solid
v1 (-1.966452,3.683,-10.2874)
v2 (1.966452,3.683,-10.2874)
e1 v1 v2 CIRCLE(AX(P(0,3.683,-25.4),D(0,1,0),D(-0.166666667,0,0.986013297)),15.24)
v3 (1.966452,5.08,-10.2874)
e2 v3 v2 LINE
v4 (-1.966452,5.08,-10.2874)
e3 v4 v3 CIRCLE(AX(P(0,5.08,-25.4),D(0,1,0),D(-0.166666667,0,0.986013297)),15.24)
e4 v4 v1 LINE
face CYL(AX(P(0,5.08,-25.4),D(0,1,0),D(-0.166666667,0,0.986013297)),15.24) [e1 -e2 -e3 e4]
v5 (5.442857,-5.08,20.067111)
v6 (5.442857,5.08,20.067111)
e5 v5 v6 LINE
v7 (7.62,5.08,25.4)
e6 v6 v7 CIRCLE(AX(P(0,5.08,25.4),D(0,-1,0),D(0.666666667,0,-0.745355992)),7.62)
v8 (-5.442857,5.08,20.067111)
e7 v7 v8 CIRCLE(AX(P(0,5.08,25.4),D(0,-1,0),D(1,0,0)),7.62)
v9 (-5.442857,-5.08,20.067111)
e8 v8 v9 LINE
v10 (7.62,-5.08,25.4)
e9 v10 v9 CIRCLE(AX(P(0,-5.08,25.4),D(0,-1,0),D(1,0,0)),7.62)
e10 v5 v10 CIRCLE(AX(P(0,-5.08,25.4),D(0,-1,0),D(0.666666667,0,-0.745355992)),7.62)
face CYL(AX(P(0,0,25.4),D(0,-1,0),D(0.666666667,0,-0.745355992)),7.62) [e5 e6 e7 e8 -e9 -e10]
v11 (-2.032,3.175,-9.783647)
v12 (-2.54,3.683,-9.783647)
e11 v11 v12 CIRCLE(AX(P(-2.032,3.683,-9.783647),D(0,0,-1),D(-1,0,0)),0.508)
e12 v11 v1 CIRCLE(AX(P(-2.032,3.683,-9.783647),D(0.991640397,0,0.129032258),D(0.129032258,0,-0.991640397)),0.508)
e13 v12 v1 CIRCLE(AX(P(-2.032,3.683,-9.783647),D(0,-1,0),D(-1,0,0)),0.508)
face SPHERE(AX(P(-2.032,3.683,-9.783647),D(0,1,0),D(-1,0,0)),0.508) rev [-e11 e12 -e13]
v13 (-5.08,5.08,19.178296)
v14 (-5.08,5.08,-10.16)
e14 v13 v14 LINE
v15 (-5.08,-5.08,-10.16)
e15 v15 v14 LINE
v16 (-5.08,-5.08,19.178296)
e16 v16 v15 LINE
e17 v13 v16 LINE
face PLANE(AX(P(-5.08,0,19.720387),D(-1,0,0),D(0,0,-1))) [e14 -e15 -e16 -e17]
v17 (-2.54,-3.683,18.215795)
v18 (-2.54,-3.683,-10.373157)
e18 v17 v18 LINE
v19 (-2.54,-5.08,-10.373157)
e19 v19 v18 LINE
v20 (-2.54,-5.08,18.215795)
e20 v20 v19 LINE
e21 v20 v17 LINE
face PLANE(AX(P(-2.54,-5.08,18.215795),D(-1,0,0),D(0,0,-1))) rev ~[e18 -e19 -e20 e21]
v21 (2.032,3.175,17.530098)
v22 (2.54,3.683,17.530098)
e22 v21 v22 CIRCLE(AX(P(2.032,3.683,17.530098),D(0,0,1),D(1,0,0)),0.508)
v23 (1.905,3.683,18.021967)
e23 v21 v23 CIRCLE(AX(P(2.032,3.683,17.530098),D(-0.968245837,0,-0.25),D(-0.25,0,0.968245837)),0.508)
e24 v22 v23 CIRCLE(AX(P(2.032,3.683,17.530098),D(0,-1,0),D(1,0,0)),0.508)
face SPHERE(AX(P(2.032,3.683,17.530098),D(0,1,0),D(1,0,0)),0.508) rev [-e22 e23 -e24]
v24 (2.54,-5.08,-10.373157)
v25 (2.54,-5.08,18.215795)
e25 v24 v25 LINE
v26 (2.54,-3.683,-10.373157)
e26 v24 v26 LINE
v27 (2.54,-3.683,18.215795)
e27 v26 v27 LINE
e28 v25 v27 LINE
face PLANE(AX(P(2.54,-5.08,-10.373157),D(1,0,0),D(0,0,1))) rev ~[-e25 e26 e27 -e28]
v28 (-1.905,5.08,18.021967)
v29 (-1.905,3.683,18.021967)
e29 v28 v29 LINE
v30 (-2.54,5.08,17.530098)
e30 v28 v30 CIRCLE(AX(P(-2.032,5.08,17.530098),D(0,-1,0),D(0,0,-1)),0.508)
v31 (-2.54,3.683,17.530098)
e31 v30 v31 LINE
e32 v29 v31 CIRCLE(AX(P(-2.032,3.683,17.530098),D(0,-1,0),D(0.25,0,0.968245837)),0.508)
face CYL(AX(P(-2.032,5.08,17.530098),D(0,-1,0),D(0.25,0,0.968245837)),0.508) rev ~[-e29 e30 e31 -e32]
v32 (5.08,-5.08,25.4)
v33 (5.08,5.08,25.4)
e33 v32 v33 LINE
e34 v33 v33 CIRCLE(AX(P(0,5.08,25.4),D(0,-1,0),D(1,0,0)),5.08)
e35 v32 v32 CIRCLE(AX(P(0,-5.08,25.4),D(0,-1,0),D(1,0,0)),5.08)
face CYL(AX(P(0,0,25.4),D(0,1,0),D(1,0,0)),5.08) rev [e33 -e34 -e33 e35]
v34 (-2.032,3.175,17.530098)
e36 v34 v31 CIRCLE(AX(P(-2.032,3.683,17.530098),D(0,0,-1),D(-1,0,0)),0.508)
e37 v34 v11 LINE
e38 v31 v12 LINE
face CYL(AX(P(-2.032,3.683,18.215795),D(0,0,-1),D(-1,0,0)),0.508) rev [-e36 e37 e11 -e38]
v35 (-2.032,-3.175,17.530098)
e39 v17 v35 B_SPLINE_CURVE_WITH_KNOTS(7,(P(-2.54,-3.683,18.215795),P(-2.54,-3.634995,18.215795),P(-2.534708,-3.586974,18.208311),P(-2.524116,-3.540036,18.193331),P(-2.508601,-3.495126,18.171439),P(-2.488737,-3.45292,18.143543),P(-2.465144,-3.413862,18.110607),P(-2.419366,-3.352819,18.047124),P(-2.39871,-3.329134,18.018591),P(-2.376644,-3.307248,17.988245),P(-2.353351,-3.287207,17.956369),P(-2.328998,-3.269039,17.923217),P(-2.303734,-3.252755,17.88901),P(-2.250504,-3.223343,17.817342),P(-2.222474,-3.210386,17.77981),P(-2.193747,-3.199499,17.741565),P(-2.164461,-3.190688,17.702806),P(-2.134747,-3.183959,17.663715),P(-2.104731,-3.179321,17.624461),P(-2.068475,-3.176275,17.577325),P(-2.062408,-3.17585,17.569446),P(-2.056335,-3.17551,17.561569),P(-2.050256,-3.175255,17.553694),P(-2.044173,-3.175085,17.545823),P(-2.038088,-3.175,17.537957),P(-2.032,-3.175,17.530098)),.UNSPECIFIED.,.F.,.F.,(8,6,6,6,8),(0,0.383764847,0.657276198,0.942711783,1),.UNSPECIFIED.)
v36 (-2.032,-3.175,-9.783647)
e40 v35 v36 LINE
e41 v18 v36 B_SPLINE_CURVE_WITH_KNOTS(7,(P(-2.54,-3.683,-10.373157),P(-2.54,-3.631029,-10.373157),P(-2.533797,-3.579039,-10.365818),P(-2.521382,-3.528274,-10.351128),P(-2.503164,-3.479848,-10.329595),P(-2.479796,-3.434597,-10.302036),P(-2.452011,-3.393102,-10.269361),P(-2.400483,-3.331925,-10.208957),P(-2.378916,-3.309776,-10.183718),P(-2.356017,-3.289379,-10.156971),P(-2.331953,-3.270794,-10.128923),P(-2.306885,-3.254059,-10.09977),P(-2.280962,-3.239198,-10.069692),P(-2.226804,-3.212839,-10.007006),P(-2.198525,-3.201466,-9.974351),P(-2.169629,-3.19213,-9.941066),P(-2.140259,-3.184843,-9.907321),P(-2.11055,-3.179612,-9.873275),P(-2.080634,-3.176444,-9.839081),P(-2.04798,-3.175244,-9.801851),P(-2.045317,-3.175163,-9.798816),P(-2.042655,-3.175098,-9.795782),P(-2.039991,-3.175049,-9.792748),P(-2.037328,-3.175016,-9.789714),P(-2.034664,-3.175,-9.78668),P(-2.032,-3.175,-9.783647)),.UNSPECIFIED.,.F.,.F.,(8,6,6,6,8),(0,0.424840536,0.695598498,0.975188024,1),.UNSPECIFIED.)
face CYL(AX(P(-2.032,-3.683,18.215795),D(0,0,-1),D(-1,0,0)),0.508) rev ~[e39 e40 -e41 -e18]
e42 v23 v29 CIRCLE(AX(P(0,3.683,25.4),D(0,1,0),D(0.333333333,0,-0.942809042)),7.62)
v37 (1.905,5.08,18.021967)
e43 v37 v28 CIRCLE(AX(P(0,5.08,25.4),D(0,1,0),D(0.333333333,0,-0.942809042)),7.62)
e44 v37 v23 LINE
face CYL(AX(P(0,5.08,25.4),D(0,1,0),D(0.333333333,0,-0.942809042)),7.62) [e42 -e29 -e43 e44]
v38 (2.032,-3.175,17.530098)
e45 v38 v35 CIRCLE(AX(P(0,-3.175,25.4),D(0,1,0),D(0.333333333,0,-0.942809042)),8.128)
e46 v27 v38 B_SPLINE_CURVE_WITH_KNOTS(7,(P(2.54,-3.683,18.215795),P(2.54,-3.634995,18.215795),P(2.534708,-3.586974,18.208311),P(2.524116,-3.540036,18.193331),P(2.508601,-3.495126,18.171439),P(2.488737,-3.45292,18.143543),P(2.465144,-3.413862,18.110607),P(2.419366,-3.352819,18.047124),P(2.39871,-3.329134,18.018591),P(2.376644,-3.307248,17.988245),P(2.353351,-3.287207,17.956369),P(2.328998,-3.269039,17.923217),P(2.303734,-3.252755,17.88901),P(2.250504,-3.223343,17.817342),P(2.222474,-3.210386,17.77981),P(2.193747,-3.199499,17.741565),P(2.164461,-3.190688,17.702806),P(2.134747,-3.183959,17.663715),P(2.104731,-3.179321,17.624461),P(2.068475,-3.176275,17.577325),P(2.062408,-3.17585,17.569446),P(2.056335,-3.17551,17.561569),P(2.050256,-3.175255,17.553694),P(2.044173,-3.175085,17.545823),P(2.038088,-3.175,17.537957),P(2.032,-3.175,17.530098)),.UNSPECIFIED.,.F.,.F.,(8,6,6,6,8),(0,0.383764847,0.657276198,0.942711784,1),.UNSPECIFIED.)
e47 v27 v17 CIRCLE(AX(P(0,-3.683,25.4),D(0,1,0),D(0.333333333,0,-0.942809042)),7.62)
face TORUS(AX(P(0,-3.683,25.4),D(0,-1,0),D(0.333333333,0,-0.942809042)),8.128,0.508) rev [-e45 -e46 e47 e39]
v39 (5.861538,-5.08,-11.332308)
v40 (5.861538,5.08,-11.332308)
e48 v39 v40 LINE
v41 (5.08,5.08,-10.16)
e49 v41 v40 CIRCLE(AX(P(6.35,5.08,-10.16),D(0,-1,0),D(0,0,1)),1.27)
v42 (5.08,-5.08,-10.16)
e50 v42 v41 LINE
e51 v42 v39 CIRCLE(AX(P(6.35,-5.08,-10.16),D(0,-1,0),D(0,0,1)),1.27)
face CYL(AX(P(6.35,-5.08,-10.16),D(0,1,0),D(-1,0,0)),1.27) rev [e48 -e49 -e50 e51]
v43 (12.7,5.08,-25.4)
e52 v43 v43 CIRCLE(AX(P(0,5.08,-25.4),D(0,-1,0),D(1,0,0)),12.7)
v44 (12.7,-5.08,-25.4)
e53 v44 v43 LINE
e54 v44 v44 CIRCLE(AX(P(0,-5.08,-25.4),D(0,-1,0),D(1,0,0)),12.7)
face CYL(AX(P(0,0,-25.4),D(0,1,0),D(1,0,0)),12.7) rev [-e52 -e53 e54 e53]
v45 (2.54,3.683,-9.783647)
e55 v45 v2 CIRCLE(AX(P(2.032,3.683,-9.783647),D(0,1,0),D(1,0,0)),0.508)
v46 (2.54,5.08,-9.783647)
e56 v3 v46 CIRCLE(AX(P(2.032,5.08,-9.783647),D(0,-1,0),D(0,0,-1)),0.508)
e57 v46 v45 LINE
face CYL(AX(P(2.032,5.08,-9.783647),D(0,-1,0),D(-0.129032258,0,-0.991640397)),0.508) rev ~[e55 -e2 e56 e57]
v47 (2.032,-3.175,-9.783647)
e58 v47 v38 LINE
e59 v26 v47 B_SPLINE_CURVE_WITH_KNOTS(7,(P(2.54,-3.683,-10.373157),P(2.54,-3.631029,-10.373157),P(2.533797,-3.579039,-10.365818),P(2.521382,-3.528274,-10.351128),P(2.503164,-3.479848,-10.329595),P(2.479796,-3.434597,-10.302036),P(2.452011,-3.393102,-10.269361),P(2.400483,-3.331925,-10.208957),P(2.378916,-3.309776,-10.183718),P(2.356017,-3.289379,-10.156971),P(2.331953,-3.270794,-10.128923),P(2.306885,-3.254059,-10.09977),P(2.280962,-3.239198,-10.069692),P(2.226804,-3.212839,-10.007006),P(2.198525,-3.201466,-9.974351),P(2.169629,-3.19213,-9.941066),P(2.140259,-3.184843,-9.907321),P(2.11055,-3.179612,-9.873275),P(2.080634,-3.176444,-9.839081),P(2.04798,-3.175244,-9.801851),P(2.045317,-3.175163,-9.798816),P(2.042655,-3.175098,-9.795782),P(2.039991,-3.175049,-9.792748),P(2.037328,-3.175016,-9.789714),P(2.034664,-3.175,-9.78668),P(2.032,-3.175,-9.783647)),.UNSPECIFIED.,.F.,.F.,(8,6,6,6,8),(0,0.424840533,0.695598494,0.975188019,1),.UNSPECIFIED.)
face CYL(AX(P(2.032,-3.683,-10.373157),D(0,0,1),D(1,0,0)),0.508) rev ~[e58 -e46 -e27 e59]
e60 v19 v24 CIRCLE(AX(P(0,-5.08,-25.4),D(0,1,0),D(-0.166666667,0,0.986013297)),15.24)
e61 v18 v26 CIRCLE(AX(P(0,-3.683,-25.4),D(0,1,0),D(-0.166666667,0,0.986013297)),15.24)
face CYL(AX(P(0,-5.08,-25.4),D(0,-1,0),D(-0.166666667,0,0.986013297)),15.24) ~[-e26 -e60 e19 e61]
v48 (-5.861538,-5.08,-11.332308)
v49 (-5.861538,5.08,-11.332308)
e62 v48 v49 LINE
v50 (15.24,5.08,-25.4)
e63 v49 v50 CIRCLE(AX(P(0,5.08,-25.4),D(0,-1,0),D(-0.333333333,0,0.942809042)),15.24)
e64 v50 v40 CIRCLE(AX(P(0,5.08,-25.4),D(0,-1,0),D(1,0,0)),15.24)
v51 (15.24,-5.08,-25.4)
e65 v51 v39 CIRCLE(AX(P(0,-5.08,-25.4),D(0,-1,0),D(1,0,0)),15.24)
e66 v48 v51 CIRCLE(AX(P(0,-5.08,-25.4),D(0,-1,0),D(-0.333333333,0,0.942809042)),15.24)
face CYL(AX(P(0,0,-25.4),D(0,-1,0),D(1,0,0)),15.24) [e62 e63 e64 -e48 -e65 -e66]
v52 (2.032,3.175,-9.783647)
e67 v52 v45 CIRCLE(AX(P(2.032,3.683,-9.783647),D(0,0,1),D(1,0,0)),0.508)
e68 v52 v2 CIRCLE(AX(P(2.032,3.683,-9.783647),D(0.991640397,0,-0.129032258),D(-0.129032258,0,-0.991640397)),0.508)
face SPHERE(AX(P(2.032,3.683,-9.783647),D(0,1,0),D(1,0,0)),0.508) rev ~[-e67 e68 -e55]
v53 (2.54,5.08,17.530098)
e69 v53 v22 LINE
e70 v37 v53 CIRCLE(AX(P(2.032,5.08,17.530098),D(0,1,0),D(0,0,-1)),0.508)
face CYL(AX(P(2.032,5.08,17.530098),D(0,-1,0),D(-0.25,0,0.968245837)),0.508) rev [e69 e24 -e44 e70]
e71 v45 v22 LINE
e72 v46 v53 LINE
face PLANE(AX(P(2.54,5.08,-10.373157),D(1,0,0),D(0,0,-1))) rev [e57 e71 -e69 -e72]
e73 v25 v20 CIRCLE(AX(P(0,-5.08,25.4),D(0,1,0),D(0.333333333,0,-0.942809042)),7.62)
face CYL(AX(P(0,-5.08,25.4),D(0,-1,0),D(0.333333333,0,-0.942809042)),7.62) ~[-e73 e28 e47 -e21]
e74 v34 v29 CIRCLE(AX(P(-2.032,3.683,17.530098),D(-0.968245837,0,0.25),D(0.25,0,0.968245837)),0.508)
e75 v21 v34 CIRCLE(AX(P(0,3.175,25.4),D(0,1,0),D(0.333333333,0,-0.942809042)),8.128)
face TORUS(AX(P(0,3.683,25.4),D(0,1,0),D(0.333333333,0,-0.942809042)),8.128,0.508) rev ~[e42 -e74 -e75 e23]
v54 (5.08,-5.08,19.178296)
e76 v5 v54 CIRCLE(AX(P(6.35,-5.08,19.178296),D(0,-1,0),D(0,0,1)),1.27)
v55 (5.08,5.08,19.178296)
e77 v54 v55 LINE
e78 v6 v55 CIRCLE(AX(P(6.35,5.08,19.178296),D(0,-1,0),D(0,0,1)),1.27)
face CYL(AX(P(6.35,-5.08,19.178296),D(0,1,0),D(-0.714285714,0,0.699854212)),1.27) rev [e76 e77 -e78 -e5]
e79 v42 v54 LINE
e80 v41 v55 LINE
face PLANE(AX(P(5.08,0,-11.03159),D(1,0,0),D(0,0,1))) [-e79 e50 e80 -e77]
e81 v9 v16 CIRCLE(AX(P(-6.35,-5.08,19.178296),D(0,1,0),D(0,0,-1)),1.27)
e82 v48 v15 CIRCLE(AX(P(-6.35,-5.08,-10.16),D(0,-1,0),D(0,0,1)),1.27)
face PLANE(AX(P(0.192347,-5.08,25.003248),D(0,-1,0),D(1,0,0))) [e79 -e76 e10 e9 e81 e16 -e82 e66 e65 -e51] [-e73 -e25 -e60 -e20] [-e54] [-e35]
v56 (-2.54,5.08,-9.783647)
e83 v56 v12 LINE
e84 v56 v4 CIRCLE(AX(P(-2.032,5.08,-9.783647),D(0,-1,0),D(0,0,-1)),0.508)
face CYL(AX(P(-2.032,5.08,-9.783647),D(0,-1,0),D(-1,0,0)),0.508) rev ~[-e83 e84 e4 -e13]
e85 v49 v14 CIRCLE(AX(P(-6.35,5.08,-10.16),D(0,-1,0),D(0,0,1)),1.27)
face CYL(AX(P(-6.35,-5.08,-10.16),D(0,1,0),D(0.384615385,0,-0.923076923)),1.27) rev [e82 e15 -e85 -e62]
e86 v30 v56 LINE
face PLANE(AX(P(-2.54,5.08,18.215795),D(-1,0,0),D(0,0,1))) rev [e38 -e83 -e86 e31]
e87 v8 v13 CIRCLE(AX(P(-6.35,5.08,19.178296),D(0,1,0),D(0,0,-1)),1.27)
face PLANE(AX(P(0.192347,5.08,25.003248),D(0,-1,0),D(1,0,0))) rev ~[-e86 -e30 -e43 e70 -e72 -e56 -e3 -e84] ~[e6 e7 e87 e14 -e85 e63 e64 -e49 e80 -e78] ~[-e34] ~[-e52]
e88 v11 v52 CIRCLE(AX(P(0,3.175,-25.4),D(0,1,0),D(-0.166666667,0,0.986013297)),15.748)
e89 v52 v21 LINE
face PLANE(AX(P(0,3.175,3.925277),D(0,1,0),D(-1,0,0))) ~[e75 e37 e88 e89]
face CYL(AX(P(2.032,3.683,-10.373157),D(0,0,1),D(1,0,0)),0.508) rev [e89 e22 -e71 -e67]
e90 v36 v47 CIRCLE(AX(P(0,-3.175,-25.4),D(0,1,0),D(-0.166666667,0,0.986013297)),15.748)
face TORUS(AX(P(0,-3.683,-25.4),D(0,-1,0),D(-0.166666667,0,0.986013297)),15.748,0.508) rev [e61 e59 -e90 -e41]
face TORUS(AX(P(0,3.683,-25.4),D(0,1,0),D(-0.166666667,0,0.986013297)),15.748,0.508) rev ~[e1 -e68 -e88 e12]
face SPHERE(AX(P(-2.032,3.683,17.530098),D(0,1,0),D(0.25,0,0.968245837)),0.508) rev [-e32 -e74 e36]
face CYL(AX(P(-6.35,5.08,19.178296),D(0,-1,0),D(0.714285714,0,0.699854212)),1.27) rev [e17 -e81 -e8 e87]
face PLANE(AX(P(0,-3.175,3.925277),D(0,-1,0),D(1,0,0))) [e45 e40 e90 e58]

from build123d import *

# Parameters (mm, degrees)
F0_R     = 5.08
F0_R_2   = 12.7
F1_DEPTH = 5.08
F2_R     = 1.27
F4_DEPTH = 1.905
F5_R     = 0.508


# Not quite as in the source:
# - a pattern or mirror of a feature is missing from the dataset's text; its kind, count and spacing are read off the source's solid


with BuildPart() as f1:
    # F0 (on Front) → F1 (new body, symmetric)
    with BuildSketch(Plane.XZ):
        with BuildLine():
            ThreePointArc((5.08, 19.7203873372), (6.9560764803, 22.2891480267), (7.62, 25.4))
            ThreePointArc((7.62, 25.4), (-3.1108519733, 32.3560764803), (-5.08, 19.7203873372))
            ThreePointArc((-5.08, 19.7203873372), (0, 17.78), (5.08, 19.7203873372))
        make_face()
        with Locations((0, 25.4)):
            Circle(F0_R, mode=Mode.SUBTRACT)
        with BuildLine():
            ThreePointArc((5.08, 19.7203873372), (0, 17.78), (-5.08, 19.7203873372))
            Line((-5.08, 19.7203873372), (-5.08, -11.0315902063))
            ThreePointArc((-5.08, -11.0315902063), (0, -10.16), (5.08, -11.0315902063))
            Line((5.08, -11.0315902063), (5.08, 19.7203873372))
        make_face()
        with BuildLine():
            ThreePointArc((5.08, -11.0315902063), (0, -10.16), (-5.08, -11.0315902063))
            ThreePointArc((-5.08, -11.0315902063), (-8.7988181024, -37.8434078933), (15.24, -25.4))
            ThreePointArc((15.24, -25.4), (12.4434078933, -16.6011818976), (5.08, -11.0315902063))
        make_face()
        with Locations((0, -25.4)):
            Circle(F0_R_2, mode=Mode.SUBTRACT)
    extrude(amount=F1_DEPTH, both=True)

    # F2
    f2_edges = [f1.edges().sort_by_distance(p)[0] for p in [
        (-5.08, 0, 19.720387),
        (-5.08, 0, -11.03159),
        (5.08, 0, 19.720387),
        (5.08, 0, -11.03159),
    ]]
    fillet(f2_edges, radius=F2_R)

    # F3 (on face) → F4 (cut)
    with BuildSketch(Plane.XZ.offset(5.08)):
        with BuildLine():
            ThreePointArc((2.54, 18.2157951031), (0, 17.78), (-2.54, 18.2157951031))
            Line((-2.54, 18.2157951031), (-2.54, -10.3731573509))
            ThreePointArc((-2.54, -10.3731573509), (0, -10.16), (2.54, -10.3731573509))
            Line((2.54, -10.3731573509), (2.54, 18.2157951031))
        make_face()
    f4 = extrude(amount=-F4_DEPTH, mode=Mode.SUBTRACT)

    # F4_copies: F4 across plane
    add(f4.mirror(Plane.ZX), mode=Mode.SUBTRACT)

    # F5
    f5_edges = [f1.edges().sort_by_distance(p)[0] for p in [
        (-2.54, -3.175, 3.921319),
        (0, -3.175, 17.78),
        (2.54, -3.175, 3.921319),
        (0, -3.175, -10.16),
        (2.54, 4.1275, -10.373157),
        (2.54, 4.1275, 18.215795),
        (2.54, 3.175, 3.921319),
        (-2.54, 4.1275, 18.215795),
        (0, 3.175, 17.78),
        (-2.54, 4.1275, -10.373157),
        (-2.54, 3.175, 3.921319),
        (0, 3.175, -10.16),
    ]]
    fillet(f5_edges, radius=F5_R)


solid = f1.part
